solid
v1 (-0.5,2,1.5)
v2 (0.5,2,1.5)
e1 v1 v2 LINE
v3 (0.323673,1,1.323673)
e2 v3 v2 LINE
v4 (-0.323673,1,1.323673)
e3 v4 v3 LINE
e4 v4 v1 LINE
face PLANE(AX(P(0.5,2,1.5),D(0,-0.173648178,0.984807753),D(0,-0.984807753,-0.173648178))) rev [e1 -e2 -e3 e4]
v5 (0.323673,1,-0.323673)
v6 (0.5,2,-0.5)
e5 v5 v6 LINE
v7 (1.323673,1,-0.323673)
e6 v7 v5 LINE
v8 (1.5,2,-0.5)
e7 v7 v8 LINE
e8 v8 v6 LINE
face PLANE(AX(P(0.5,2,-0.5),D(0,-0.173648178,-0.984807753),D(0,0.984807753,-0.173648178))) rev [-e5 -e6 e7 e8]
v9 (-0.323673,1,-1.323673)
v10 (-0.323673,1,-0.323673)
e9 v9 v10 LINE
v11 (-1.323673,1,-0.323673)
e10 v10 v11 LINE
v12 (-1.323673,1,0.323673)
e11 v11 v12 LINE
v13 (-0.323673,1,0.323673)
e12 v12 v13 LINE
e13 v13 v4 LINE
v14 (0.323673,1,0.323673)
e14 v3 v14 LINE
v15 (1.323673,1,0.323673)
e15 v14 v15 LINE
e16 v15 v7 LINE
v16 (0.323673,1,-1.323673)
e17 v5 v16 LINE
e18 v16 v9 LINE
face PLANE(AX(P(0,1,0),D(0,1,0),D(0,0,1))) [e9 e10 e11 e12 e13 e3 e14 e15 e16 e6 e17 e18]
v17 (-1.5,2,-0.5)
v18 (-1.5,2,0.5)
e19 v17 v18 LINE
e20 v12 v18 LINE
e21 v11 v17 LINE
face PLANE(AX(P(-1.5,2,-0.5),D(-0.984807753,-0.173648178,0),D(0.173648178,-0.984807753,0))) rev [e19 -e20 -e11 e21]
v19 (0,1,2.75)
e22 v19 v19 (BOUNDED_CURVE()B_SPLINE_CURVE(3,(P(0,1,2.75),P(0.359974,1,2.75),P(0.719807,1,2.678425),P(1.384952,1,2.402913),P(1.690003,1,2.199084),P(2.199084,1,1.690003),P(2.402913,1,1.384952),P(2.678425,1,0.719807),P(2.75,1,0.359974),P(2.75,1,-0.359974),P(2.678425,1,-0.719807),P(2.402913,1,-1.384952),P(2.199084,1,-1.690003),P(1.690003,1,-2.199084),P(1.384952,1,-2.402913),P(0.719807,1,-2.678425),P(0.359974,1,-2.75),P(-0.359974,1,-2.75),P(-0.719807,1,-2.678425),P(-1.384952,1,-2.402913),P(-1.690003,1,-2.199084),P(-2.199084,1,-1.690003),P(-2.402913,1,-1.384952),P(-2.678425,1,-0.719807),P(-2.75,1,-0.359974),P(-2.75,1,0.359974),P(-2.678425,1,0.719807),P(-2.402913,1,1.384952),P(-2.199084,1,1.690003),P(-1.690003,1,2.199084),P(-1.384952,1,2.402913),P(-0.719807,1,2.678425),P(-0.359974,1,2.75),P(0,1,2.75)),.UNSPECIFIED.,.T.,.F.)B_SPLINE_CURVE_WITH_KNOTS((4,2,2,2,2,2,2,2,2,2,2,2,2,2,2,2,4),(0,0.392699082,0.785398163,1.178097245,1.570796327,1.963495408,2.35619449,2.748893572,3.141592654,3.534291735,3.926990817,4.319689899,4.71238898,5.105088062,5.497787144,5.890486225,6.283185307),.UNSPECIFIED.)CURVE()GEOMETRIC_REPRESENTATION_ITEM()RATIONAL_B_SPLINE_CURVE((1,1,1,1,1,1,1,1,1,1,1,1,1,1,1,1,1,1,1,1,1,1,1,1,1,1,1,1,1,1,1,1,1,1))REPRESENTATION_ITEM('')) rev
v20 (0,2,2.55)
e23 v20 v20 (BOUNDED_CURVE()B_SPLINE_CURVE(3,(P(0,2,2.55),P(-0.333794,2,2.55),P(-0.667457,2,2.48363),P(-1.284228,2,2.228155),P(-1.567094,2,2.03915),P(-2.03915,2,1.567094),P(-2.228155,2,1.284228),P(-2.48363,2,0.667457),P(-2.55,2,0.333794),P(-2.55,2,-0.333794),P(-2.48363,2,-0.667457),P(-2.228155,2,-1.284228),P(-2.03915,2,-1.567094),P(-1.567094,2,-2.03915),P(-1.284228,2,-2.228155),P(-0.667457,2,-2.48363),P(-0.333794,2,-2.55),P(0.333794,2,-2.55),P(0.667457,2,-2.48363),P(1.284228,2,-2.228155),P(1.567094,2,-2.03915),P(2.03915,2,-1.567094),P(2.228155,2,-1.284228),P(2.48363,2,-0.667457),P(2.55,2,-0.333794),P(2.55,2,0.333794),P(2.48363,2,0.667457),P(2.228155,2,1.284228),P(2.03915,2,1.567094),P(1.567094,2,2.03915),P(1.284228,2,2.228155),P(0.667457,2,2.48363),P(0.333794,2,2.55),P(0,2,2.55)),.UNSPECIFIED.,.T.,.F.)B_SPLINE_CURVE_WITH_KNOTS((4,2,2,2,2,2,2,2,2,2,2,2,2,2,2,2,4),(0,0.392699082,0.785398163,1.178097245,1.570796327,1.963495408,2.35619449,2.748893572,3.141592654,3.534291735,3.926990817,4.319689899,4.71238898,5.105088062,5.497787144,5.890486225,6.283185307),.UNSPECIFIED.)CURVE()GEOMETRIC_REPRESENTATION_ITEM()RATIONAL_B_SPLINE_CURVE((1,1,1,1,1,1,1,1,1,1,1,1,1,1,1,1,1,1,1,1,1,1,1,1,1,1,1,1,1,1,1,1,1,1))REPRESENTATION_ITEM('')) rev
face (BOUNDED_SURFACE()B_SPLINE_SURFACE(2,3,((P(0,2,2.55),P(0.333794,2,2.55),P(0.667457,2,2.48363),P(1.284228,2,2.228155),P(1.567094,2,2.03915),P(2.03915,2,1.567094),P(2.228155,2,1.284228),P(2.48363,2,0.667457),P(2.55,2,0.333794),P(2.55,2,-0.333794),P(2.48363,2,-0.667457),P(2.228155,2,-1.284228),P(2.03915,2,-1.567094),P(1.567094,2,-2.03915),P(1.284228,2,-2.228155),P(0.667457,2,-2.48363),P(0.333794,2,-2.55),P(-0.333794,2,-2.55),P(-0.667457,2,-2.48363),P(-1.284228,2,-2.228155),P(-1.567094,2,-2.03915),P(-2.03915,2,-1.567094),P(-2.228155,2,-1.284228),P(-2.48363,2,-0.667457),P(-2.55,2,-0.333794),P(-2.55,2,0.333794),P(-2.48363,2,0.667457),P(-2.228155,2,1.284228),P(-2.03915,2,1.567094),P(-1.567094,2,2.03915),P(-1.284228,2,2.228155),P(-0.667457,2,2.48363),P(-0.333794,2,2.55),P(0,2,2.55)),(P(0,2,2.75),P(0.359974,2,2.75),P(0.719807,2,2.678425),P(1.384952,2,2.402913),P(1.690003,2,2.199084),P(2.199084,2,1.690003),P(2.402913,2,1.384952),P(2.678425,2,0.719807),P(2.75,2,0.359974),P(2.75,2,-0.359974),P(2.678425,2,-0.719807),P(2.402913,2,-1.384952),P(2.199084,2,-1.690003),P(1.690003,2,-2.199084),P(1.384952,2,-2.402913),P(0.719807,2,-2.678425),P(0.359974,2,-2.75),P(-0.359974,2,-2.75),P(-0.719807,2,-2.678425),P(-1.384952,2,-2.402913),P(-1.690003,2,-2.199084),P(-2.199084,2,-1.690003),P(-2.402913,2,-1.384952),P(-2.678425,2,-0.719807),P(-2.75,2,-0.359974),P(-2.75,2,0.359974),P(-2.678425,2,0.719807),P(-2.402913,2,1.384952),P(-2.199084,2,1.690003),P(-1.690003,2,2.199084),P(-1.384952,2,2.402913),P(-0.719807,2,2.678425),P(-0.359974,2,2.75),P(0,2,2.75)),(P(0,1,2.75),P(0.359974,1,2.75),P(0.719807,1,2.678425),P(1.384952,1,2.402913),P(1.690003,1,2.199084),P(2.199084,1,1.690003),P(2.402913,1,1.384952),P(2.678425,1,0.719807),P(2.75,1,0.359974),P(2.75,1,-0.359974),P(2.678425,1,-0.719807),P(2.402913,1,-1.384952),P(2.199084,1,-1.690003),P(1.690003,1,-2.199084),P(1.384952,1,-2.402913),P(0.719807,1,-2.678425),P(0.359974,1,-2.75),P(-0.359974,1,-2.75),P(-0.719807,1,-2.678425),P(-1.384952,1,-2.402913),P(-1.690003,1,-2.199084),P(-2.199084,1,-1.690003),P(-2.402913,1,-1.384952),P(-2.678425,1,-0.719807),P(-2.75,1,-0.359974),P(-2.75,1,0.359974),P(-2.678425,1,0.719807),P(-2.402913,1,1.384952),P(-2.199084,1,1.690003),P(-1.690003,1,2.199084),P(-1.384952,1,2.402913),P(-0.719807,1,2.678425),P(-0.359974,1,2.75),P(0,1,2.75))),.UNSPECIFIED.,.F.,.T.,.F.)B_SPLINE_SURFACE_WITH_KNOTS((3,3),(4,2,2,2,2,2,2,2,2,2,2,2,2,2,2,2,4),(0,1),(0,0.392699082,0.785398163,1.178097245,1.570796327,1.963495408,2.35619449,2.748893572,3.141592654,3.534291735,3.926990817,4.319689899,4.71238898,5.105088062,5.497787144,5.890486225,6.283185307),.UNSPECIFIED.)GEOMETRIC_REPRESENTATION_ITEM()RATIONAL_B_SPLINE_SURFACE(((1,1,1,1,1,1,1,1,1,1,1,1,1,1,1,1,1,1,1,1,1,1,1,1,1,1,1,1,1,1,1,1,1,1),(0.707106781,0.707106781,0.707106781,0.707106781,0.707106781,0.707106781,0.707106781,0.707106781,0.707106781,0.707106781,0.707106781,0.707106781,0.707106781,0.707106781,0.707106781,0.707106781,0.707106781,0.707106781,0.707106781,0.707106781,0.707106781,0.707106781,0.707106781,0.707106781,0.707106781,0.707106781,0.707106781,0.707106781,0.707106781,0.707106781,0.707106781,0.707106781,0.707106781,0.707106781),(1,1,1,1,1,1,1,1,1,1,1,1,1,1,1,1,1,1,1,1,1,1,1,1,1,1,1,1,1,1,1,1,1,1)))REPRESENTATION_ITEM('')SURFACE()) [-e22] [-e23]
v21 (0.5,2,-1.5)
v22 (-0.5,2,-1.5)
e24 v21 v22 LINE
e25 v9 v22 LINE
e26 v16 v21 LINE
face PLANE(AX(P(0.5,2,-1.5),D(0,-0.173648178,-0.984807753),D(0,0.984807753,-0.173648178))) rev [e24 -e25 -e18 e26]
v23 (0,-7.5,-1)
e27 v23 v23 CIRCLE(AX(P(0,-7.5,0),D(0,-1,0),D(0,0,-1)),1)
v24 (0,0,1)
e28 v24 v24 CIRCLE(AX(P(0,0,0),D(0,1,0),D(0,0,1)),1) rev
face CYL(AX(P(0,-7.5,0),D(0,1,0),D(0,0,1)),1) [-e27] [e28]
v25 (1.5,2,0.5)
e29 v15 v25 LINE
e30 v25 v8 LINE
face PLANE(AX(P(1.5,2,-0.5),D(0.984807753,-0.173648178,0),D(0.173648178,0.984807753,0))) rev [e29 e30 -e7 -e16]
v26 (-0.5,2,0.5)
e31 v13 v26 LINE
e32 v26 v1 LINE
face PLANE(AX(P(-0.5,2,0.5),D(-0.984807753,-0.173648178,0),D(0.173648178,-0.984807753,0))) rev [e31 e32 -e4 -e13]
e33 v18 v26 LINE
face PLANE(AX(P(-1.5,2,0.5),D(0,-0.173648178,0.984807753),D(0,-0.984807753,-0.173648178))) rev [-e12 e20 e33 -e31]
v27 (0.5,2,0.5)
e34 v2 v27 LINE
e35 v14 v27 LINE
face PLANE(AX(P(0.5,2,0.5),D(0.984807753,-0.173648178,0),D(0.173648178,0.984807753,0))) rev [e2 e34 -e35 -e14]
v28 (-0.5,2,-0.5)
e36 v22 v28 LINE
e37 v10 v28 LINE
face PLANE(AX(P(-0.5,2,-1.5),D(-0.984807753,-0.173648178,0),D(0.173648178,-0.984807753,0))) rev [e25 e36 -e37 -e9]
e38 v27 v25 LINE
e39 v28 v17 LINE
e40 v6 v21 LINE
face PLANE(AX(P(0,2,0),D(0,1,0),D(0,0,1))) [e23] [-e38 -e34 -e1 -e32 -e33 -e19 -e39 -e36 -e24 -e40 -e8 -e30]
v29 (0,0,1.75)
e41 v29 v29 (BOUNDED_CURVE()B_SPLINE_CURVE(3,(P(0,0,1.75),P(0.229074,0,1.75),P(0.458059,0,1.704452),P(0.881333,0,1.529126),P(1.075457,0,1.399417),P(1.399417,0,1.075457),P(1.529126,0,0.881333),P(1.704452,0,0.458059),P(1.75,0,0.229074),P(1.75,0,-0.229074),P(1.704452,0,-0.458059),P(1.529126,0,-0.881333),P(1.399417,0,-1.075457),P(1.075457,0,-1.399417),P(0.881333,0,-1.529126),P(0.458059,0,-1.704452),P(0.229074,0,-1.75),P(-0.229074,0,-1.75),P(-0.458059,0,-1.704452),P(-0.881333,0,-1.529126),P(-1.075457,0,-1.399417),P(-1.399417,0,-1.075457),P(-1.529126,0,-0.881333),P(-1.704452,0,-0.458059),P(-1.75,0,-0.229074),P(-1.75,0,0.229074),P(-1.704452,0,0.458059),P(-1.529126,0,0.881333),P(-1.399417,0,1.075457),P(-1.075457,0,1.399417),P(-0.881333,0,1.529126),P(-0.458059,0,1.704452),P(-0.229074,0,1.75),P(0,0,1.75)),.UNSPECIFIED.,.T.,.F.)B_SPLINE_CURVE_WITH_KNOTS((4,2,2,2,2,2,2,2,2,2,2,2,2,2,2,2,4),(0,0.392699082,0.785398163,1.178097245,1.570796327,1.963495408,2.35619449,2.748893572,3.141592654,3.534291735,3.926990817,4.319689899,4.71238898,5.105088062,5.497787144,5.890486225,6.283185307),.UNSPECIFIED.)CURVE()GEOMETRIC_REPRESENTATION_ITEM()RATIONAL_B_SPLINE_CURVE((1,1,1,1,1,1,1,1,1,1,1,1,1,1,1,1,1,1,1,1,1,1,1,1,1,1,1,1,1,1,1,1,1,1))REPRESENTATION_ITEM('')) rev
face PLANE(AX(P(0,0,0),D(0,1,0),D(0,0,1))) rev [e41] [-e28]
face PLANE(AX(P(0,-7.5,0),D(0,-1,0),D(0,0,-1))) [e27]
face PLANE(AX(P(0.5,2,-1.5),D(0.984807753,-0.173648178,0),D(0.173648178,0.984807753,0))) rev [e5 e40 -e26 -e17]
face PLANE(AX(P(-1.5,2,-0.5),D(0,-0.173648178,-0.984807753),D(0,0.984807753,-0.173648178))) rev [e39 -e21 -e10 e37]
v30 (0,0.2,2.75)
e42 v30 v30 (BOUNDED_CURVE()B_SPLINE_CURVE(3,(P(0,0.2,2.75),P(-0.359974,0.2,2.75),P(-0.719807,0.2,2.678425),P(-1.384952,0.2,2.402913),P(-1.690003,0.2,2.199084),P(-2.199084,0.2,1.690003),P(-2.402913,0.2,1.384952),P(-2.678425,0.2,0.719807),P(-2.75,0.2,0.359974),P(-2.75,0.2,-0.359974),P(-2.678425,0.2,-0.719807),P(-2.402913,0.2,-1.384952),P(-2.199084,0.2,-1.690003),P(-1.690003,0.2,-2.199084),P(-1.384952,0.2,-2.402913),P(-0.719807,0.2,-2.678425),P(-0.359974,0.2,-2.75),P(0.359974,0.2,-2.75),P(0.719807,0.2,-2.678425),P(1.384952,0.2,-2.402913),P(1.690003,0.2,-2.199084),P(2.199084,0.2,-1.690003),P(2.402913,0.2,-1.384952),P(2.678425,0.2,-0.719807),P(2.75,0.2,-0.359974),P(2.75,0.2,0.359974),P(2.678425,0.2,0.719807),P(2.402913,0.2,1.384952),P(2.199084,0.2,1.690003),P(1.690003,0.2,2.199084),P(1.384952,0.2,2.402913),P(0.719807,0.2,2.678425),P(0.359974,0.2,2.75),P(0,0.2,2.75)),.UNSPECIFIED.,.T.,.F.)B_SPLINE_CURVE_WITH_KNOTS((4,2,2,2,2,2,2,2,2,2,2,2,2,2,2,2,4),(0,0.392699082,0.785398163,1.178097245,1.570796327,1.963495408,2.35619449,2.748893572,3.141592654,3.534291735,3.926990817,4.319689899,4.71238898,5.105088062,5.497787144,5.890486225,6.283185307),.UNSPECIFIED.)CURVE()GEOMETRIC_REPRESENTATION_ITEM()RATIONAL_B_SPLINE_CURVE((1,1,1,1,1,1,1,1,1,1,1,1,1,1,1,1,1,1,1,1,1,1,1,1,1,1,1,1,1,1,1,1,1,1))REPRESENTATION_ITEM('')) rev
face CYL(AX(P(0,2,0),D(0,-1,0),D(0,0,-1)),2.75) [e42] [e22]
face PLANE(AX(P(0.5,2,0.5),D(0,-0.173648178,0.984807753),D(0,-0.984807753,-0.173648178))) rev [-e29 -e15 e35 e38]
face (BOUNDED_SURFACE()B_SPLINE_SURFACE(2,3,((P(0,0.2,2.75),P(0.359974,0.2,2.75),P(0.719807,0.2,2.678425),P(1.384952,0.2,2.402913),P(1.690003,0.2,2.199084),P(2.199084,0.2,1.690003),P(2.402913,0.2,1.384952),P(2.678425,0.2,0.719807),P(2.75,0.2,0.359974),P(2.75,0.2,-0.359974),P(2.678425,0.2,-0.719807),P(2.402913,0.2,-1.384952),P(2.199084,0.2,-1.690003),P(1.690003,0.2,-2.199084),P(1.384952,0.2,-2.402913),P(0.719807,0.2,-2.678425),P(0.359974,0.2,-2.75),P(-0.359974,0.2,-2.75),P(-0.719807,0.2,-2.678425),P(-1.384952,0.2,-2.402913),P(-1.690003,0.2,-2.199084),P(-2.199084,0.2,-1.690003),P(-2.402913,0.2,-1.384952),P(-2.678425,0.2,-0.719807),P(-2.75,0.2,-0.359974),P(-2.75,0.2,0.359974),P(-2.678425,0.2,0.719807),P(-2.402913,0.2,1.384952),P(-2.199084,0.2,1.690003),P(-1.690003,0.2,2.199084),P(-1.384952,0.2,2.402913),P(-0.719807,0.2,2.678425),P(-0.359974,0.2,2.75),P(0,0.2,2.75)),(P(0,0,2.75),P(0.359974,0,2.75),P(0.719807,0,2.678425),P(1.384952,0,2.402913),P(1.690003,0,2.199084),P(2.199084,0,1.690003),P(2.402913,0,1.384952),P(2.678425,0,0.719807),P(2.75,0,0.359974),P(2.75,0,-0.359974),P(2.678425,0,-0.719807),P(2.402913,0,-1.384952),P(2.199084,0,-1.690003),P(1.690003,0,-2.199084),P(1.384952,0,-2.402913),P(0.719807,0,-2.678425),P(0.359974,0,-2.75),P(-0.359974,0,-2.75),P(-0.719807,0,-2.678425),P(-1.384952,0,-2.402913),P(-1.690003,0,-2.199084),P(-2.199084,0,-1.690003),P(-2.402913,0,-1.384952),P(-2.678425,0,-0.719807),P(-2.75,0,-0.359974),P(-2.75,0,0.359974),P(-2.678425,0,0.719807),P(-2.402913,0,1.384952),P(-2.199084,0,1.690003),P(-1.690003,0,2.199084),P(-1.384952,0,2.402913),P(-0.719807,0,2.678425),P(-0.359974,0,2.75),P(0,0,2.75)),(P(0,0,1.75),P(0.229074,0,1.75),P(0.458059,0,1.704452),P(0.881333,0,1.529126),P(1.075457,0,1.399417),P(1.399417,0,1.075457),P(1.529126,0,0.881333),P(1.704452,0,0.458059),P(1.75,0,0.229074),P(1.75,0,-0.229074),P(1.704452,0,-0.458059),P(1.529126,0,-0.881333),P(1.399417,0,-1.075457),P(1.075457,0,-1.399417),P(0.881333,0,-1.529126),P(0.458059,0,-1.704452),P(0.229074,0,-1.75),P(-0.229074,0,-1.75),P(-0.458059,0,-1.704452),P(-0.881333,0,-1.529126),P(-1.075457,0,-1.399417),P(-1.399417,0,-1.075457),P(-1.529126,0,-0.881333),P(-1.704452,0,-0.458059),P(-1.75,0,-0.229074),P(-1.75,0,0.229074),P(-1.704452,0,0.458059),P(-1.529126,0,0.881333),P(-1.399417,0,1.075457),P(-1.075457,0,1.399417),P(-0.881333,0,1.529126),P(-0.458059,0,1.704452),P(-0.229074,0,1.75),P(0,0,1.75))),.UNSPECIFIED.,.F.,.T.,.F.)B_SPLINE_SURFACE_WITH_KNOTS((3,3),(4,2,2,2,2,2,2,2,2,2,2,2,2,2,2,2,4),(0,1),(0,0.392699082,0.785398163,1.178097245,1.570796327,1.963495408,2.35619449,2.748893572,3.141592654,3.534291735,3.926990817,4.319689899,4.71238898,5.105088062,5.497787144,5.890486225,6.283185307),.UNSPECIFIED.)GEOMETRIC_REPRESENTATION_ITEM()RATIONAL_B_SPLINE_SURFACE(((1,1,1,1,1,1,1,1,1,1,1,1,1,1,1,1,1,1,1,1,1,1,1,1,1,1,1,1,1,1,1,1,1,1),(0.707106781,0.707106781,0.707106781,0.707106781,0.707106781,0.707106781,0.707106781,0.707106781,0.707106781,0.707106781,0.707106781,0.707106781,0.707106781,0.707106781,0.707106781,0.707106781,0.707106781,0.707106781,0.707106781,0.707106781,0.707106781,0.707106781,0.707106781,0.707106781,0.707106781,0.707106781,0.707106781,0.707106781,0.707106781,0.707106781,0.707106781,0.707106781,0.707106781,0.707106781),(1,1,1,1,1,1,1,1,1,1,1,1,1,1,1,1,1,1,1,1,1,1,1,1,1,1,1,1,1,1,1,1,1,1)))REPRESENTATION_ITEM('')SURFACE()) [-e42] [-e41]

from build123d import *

# Parameters (mm, degrees)
SKETCH1_R           = 2.75
BOSS_EXTRUDE1_DEPTH = 2
FILLET1_SIZE        = 0.2
FILLET1_SIZE_2      = 1
SKETCH2_R           = 1
BOSS_EXTRUDE2_DEPTH = 7.5
CUT_EXTRUDE1_DEPTH  = 1
CUT_EXTRUDE1_DRAFT  = -10


with BuildPart() as part:
    # Sketch1 → Boss-Extrude1 (new body)
    with BuildSketch(Plane(origin=(0, 0, 0), x_dir=(1, 0, 0), z_dir=(0, 1, 0))):
        with Locations(Location((0, 0, 0), (0, 0, 270))):
            Circle(SKETCH1_R)
    extrude(amount=BOSS_EXTRUDE1_DEPTH)

    # Fillet1
    # an asymmetric fillet: 1, 0.2 mm, written as the material it takes off along each edge
    with BuildSketch(Plane(origin=(0, 0, 0), x_dir=(0, 0, 1), z_dir=(-1, 0, 0))) as fillet1_piece_1:
        with BuildLine():
            Bezier((2.75, FILLET1_SIZE), (2.75, 0), (2.75 - FILLET1_SIZE_2, 0), weights=[1, 0.707106781, 1])
            Line((2.75 - FILLET1_SIZE_2, 0), (2.75, 0))
            Line((2.75, 0), (2.75, FILLET1_SIZE))
        make_face()
    revolve(axis=Axis((0, 0, 0), (0, 1, 0)), mode=Mode.SUBTRACT)
    with BuildSketch(Plane(origin=(0, 2, 0), x_dir=(0, 0, 1), z_dir=(-1, 0, 0))) as fillet1_piece_2:
        with BuildLine():
            Bezier((2.75, -FILLET1_SIZE_2), (2.75, 0), (2.75 - FILLET1_SIZE, 0), weights=[1, 0.707106781, 1])
            Line((2.75 - FILLET1_SIZE, 0), (2.75, 0))
            Line((2.75, 0), (2.75, -FILLET1_SIZE_2))
        make_face()
    revolve(axis=Axis((0, 2, 0), (0, 1, 0)), mode=Mode.SUBTRACT)

    # Sketch2 → Boss-Extrude2 (add)
    with BuildSketch(Plane.XZ):
        with Locations(Location((0, 0, 0), (0, 0, 90))):
            Circle(SKETCH2_R)
    extrude(amount=BOSS_EXTRUDE2_DEPTH)


with BuildPart() as cut_extrude1_tool:
    # Sketch5 → Cut-Extrude1 (with draft: the straight prism first)
    with BuildSketch(Plane(origin=(0, 2, 0), x_dir=(1, 0, 0), z_dir=(0, 1, 0))):
        Polygon((0.5, 0.5), (0.5, 1.5), (-0.5, 1.5), (-0.5, 0.5), (-1.5, 0.5), (-1.5, -0.5), (-0.5, -0.5), (-0.5, -1.5), (0.5, -1.5), (0.5, -0.5), (1.5, -0.5), (1.5, 0.5), align=None)
    extrude(amount=-CUT_EXTRUDE1_DEPTH)
    # Cut-Extrude1: the draft: its side faces are tilted about the plane it starts from
    cut_extrude1_sides = [cut_extrude1_tool.faces().sort_by_distance(p)[0] for p in [
        (0.5, 1.5, -1),
        (0, 1.5, -1.5),
        (-0.5, 1.5, -1),
        (-1, 1.5, -0.5),
        (-1.5, 1.5, 0),
        (-1, 1.5, 0.5),
        (-0.5, 1.5, 1),
        (0, 1.5, 1.5),
        (0.5, 1.5, 1),
        (1, 1.5, 0.5),
        (1.5, 1.5, 0),
        (1, 1.5, -0.5),
    ]]
    draft(cut_extrude1_sides, Plane(origin=(0, 2, 0), x_dir=(1, 0, 0), z_dir=(0, 1, 0)), CUT_EXTRUDE1_DRAFT)


with BuildPart() as part_1:
    add(part.part)

    # Cut-Extrude1: cut by cut_extrude1_tool
    add(cut_extrude1_tool.part, mode=Mode.SUBTRACT)


solid = part_1.part
